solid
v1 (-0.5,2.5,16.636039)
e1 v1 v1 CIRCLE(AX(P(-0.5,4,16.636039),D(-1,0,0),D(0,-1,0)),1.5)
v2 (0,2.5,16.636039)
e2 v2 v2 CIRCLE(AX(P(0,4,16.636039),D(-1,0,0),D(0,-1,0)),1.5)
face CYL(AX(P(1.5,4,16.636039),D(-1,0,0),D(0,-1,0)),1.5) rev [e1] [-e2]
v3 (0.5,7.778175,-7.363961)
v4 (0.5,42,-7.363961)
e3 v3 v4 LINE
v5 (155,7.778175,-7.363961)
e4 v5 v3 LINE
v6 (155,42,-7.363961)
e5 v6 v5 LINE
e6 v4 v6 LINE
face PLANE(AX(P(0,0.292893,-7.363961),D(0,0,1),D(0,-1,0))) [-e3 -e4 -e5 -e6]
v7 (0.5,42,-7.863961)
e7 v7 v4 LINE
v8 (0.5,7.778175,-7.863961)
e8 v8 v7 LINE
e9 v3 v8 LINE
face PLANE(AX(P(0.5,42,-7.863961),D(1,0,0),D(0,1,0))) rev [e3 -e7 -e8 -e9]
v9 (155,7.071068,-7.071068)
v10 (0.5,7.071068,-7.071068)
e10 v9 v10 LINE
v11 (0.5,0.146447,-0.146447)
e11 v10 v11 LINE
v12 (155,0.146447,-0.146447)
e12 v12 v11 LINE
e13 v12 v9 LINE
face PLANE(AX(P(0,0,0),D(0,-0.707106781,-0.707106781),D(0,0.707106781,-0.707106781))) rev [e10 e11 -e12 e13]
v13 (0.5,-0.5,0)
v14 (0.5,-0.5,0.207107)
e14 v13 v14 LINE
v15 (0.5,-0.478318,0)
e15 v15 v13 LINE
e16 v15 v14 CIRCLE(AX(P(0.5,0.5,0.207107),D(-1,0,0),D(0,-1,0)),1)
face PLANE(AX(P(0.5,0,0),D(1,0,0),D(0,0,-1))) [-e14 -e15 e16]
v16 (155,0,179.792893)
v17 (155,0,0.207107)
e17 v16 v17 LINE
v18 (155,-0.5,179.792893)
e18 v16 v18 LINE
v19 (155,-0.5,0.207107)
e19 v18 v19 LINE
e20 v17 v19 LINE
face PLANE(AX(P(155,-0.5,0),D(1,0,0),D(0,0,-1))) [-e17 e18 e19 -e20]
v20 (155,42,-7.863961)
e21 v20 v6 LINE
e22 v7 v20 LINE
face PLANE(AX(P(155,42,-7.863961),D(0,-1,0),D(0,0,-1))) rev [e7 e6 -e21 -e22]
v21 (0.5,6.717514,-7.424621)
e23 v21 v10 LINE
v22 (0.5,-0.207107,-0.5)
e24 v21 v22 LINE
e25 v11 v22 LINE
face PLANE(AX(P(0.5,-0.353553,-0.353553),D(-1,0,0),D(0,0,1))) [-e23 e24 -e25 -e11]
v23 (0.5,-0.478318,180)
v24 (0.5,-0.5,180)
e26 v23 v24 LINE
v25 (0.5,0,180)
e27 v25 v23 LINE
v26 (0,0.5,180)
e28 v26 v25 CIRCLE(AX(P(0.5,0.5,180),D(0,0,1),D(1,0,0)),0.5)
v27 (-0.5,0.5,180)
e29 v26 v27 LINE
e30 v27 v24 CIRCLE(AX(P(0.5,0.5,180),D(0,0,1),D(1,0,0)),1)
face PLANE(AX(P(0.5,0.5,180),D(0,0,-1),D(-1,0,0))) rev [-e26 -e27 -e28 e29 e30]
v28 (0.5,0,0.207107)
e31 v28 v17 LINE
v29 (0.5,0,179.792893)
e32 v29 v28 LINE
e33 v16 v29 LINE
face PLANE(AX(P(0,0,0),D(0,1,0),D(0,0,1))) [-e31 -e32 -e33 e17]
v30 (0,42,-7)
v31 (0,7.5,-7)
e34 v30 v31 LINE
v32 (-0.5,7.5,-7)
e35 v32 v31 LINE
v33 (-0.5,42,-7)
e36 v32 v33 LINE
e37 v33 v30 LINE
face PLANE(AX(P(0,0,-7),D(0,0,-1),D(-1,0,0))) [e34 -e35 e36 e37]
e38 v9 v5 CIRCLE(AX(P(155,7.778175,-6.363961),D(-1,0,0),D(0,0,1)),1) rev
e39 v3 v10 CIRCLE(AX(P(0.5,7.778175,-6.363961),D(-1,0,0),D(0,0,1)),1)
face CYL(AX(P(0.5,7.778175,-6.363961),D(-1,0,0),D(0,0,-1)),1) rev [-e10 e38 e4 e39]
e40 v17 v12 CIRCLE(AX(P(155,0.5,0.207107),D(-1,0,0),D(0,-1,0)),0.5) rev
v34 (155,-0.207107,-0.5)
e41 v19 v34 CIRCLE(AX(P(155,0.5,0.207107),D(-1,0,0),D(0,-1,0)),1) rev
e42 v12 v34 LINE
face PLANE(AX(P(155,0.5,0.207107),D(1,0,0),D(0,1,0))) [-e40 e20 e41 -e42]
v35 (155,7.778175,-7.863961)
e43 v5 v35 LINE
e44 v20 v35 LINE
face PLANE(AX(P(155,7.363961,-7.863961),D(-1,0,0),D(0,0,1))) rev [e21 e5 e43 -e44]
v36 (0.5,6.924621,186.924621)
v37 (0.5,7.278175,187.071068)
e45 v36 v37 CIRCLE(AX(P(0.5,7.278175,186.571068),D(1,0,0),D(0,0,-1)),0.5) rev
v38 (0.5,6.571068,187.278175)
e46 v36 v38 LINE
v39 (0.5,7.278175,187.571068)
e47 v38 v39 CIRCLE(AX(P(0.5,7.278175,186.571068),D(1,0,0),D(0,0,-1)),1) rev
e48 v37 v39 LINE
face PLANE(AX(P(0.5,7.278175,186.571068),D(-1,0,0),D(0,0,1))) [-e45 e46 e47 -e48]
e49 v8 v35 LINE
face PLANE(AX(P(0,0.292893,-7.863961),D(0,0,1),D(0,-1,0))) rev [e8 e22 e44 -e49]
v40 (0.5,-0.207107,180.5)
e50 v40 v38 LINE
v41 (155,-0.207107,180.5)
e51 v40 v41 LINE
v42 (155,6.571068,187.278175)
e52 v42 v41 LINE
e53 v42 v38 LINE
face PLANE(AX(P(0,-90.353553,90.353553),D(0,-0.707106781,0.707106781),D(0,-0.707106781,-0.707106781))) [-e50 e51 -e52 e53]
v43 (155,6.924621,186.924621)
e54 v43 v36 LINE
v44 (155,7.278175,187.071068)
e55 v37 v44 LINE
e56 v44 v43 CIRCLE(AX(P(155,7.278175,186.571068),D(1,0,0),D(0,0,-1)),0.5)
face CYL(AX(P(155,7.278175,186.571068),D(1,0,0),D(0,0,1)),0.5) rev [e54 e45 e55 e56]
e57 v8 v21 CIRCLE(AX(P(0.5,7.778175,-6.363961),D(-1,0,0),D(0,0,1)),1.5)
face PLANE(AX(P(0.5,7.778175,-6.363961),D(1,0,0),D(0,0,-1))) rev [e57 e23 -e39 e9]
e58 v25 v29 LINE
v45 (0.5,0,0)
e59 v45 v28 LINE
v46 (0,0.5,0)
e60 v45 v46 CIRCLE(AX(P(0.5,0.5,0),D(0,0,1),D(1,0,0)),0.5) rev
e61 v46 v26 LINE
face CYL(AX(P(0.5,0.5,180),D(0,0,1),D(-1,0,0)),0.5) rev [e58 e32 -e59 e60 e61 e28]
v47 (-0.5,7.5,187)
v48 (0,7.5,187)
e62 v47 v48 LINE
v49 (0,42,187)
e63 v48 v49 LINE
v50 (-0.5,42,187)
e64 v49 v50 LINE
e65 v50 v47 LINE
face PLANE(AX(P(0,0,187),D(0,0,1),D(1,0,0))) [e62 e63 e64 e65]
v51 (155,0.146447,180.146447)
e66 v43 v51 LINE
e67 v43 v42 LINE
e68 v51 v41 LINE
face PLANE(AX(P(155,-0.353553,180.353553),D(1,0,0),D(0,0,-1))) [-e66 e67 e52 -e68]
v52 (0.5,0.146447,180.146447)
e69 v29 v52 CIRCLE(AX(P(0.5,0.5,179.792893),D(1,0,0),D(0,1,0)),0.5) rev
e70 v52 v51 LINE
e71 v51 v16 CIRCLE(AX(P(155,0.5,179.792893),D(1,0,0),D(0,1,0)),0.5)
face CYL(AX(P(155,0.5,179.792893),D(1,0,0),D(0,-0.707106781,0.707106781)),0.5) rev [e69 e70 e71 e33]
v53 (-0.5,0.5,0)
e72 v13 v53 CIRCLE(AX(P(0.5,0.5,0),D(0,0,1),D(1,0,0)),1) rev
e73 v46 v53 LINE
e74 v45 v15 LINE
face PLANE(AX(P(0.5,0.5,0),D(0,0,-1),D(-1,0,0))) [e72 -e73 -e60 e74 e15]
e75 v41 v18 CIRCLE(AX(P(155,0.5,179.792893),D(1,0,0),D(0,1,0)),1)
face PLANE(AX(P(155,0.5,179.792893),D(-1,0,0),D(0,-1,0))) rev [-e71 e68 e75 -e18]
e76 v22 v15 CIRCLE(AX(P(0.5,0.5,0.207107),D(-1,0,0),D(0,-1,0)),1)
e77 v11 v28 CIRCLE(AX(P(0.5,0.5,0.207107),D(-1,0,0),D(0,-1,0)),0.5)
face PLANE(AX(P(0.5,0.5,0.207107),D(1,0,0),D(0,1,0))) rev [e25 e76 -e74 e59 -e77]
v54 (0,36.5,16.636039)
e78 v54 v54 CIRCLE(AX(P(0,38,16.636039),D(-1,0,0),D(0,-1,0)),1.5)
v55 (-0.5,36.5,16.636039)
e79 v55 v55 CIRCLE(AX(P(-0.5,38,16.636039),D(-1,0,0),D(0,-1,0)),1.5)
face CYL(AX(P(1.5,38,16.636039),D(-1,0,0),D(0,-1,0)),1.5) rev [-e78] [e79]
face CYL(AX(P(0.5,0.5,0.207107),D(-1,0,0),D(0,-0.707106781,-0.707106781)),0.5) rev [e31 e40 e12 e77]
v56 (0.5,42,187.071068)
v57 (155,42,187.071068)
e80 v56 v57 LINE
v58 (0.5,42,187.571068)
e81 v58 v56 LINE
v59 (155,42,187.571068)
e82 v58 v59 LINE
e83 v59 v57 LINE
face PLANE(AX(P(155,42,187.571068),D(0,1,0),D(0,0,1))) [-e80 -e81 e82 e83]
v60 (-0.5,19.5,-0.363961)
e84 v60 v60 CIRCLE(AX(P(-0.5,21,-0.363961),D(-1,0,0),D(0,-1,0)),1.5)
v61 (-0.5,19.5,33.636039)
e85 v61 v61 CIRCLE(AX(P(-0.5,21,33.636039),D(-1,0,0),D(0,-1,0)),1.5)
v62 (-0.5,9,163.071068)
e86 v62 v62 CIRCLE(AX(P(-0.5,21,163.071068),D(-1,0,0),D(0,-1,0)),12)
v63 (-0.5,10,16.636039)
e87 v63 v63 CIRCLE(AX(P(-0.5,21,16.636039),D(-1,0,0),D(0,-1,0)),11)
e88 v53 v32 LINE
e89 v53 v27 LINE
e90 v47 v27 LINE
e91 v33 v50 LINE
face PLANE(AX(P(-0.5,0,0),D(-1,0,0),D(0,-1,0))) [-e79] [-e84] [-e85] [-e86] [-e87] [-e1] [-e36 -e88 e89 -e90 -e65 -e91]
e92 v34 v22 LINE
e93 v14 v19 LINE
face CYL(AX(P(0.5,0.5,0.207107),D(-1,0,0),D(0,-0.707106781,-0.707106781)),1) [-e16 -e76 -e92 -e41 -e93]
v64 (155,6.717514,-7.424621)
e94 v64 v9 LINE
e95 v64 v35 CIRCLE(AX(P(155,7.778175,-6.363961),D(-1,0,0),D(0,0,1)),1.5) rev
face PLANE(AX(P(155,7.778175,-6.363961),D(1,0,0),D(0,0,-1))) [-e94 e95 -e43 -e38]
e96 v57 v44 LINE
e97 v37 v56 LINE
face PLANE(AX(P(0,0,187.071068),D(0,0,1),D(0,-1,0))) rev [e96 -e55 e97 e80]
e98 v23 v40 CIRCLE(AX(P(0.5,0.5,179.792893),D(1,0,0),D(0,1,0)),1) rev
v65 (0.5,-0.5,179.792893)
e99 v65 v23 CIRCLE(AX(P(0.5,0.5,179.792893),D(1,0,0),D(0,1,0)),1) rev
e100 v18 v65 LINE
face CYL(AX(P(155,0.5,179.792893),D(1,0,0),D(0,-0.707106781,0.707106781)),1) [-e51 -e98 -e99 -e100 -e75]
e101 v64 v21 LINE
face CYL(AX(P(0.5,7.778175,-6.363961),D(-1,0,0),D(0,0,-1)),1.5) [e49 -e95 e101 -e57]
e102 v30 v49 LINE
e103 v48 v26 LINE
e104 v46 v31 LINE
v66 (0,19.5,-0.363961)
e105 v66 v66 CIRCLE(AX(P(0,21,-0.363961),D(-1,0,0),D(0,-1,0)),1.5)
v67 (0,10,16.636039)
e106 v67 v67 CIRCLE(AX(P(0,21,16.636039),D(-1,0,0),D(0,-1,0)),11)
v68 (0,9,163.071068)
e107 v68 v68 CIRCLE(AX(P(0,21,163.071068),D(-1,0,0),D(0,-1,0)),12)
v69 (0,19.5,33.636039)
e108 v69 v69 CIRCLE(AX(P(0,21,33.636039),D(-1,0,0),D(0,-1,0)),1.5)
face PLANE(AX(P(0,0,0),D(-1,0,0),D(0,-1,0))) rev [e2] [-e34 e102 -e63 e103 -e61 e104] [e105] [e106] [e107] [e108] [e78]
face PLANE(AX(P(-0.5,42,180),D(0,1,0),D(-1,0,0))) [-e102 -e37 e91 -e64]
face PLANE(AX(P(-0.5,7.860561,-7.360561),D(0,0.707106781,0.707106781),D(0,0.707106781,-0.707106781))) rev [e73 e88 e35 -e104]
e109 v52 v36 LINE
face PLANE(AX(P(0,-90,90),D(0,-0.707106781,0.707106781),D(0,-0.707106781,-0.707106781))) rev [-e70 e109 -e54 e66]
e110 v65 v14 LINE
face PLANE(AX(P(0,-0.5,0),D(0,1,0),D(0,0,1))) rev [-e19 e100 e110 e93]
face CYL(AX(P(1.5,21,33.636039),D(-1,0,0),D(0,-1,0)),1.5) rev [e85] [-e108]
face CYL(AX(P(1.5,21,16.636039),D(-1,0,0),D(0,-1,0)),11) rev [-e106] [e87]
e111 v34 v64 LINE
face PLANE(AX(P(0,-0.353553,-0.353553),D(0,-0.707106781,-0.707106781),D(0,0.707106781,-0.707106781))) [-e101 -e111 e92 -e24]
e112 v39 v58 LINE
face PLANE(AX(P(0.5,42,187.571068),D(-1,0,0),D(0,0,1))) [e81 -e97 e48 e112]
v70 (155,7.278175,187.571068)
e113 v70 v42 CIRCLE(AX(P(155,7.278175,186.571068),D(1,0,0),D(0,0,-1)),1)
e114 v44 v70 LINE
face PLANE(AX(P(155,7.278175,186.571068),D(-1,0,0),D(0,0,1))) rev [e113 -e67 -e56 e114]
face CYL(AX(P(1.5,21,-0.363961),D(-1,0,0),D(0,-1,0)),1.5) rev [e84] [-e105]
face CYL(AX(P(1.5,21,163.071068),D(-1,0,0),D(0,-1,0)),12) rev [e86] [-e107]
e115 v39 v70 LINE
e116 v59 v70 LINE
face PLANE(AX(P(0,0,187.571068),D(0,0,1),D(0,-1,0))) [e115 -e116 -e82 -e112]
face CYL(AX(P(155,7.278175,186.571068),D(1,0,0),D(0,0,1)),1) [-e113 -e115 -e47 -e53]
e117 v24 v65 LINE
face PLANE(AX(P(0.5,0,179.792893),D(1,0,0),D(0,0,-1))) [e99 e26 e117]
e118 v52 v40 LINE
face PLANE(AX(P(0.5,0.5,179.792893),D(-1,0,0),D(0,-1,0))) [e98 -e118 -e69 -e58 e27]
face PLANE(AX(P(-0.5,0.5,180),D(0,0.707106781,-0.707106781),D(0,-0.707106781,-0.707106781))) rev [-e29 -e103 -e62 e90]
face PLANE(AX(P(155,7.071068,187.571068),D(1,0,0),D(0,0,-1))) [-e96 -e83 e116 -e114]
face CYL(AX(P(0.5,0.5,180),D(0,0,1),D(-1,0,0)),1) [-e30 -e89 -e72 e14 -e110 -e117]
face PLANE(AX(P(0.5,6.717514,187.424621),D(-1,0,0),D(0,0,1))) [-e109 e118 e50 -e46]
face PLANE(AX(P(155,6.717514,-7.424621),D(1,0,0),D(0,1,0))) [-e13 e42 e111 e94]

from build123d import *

# Parameters (mm, degrees)
SKETCH1_W                    = 155
SKETCH1_H                    = 180
BASE_FLANGE1_DEPTH           = 0.5
EDGE_FLANGE1_STRIP_W         = 3
EDGE_FLANGE1_STRIP_H         = 0.5
EDGE_FLANGE1_STRIP_CUT_DEPTH = 180
EDGE_FLANGE1_DEPTH           = 180
EDGE_FLANGE3_STRIP_CUT_DEPTH = 154.5
EDGE_FLANGE3_DEPTH           = 154.5
EDGE_FLANGE4_DEPTH           = 154.5
SKETCH25_W                   = 0.5
SKETCH25_H                   = 41.5
BOSS_EXTRUDE1_DEPTH          = 7
CUT_EXTRUDE2_DEPTH           = 0.5
EDGE_FLANGE5_STRIP_CUT_DEPTH = 154.5
EDGE_FLANGE5_DEPTH           = 154.5
EDGE_FLANGE6_STRIP_CUT_DEPTH = 154.5
EDGE_FLANGE6_DEPTH           = 154.5
SKETCH41_W                   = 0.5
SKETCH41_H                   = 41.5
BOSS_EXTRUDE2_DEPTH          = 7
CUT_EXTRUDE3_DEPTH           = 0.5
SKETCH45_R                   = 11
SKETCH45_R_2                 = 12
CUT_EXTRUDE6_DEPTH           = 2
SKETCH51_R                   = 1.5
CUT_EXTRUDE7_DEPTH           = 2


# Sheet-metal steps are written as plain solids
with BuildPart() as part:
    # Sketch1 → Base-Flange1 (new body)
    with BuildSketch(Plane(origin=(0, 0, 0), x_dir=(1, 0, 0), z_dir=(0, 1, 0))):
        with Locations((77.5, -90)):
            Rectangle(SKETCH1_W, SKETCH1_H)
    extrude(amount=-BASE_FLANGE1_DEPTH)

    # Edge-Flange1 strip (across the edge) → Edge-Flange1 strip cut (cut)
    with BuildSketch(Plane.XY):
        with Locations((-1, -0.25)):
            Rectangle(EDGE_FLANGE1_STRIP_W, EDGE_FLANGE1_STRIP_H)
    extrude(amount=EDGE_FLANGE1_STRIP_CUT_DEPTH, mode=Mode.SUBTRACT)

    # Edge-Flange1 section (across the edge) → Edge-Flange1 (add)
    with BuildSketch(Plane.XY):
        with BuildLine():
            Line((-0.5, 0.5), (-0.5, 42))
            Line((-0.5, 42), (0, 42))
            Line((0, 42), (0, 0.5))
            ThreePointArc((0, 0.5), (0.146446609, 0.146446609), (0.5, 0))
            Line((0.5, 0), (0.5, -0.5))
            ThreePointArc((0.5, -0.5), (-0.207106781, -0.207106781), (-0.5, 0.5))
        make_face()
    extrude(amount=EDGE_FLANGE1_DEPTH)

    # Edge-Flange3 strip (across the edge) → Edge-Flange3 strip cut (cut)
    with BuildSketch(Plane(origin=(155, 0, 0), x_dir=(0, 0.7071067811865512, 0.7071067811865438), z_dir=(-1, 0, 0))):
        Polygon((-2.328427125, 1.621320344), (-0.207106781, -0.5), (0.146446609, -0.146446609), (-1.974873734, 1.974873734), align=None)
    extrude(amount=EDGE_FLANGE3_STRIP_CUT_DEPTH, mode=Mode.SUBTRACT)

    # Edge-Flange3 section (across the edge) → Edge-Flange3 (add)
    with BuildSketch(Plane(origin=(155, 0, 0), x_dir=(0, 0.7071067811865512, 0.7071067811865438), z_dir=(-1, 0, 0))):
        with BuildLine():
            Line((-0.5, 0.207106781), (-0.5, 10))
            Line((-0.5, 10), (0, 10))
            Line((0, 10), (0, 0.207106781))
            ThreePointArc((0, 0.207106781), (0.038060234, 0.015765065), (0.146446609, -0.146446609))
            Line((0.146446609, -0.146446609), (-0.207106781, -0.5))
            ThreePointArc((-0.207106781, -0.5), (-0.423879533, -0.175576651), (-0.5, 0.207106781))
        make_face()
    extrude(amount=EDGE_FLANGE3_DEPTH)

    # Edge-Flange4 section (across the edge) → Edge-Flange4 (add)
    with BuildSketch(Plane(origin=(155, 7.363961031, -7.363961031), x_dir=(0, 0, 1), z_dir=(-1, 0, 0))):
        with BuildLine():
            Line((-0.5, 0.414213562), (-0.5, 34.636038969))
            Line((-0.5, 34.636038969), (0, 34.636038969))
            Line((0, 34.636038969), (0, 0.414213562))
            ThreePointArc((0, 0.414213562), (0.076120467, 0.03153013), (0.292893219, -0.292893219))
            Line((0.292893219, -0.292893219), (-0.060660172, -0.646446609))
            ThreePointArc((-0.060660172, -0.646446609), (-0.385819299, -0.159811586), (-0.5, 0.414213562))
        make_face()
    extrude(amount=EDGE_FLANGE4_DEPTH)

    # Sketch25 → Boss-Extrude1 (add)
    with BuildSketch(Plane(origin=(0, 0, 0), x_dir=(-1, 0, 0), z_dir=(0, 0, -1))):
        with Locations((0.25, 21.25)):
            Rectangle(SKETCH25_W, SKETCH25_H)
    extrude(amount=BOSS_EXTRUDE1_DEPTH)

    # Sketch28 → Cut-Extrude2 (cut)
    with BuildSketch(Plane.ZY.offset(0.5)):
        Polygon((-7.360561455, 7.860561455), (0, 0.5), (-7.360561455, 0.5), align=None)
    extrude(amount=-CUT_EXTRUDE2_DEPTH, mode=Mode.SUBTRACT)

    # Edge-Flange5 strip (across the edge) → Edge-Flange5 strip cut (cut)
    with BuildSketch(Plane(origin=(0.5, 0, 180), x_dir=(0, 0.7071067811865512, -0.7071067811865438), z_dir=(1, 0, 0))):
        Polygon((-2.328427125, 1.621320344), (-0.207106781, -0.5), (0.146446609, -0.146446609), (-1.974873734, 1.974873734), align=None)
    extrude(amount=EDGE_FLANGE5_STRIP_CUT_DEPTH, mode=Mode.SUBTRACT)

    # Edge-Flange5 section (across the edge) → Edge-Flange5 (add)
    with BuildSketch(Plane(origin=(0.5, 0, 180), x_dir=(0, 0.7071067811865512, -0.7071067811865438), z_dir=(1, 0, 0))):
        with BuildLine():
            Line((-0.5, 0.207106781), (-0.5, 10))
            Line((-0.5, 10), (0, 10))
            Line((0, 10), (0, 0.207106781))
            ThreePointArc((0, 0.207106781), (0.038060234, 0.015765065), (0.146446609, -0.146446609))
            Line((0.146446609, -0.146446609), (-0.207106781, -0.5))
            ThreePointArc((-0.207106781, -0.5), (-0.423879533, -0.175576651), (-0.5, 0.207106781))
        make_face()
    extrude(amount=EDGE_FLANGE5_DEPTH)

    # Edge-Flange6 strip (across the edge) → Edge-Flange6 strip cut (cut)
    with BuildSketch(Plane(origin=(0.5, 7.071067812, 187.071067812), x_dir=(0, 0, -1), z_dir=(1, 0, 0))):
        Polygon((-2.328427125, 1.621320344), (-0.207106781, -0.5), (0.146446609, -0.146446609), (-1.974873734, 1.974873734), align=None)
    extrude(amount=EDGE_FLANGE6_STRIP_CUT_DEPTH, mode=Mode.SUBTRACT)

    # Edge-Flange6 section (across the edge) → Edge-Flange6 (add)
    with BuildSketch(Plane(origin=(0.5, 7.071067812, 187.071067812), x_dir=(0, 0, -1), z_dir=(1, 0, 0))):
        with BuildLine():
            Line((-0.5, 0.207106781), (-0.5, 34.928932188))
            Line((-0.5, 34.928932188), (0, 34.928932188))
            Line((0, 34.928932188), (0, 0.207106781))
            ThreePointArc((0, 0.207106781), (0.038060234, 0.015765065), (0.146446609, -0.146446609))
            Line((0.146446609, -0.146446609), (-0.207106781, -0.5))
            ThreePointArc((-0.207106781, -0.5), (-0.423879533, -0.175576651), (-0.5, 0.207106781))
        make_face()
    extrude(amount=EDGE_FLANGE6_DEPTH)

    # Sketch41 → Boss-Extrude2 (add)
    with BuildSketch(Plane.XY.offset(180)):
        with Locations((-0.25, 21.25)):
            Rectangle(SKETCH41_W, SKETCH41_H)
    extrude(amount=BOSS_EXTRUDE2_DEPTH)

    # Sketch44 → Cut-Extrude3 (cut)
    with BuildSketch(Plane.ZY.offset(0.5)):
        Polygon((180, 0.5), (187, 7.5), (187, 0.5), align=None)
    extrude(amount=-CUT_EXTRUDE3_DEPTH, mode=Mode.SUBTRACT)

    # Sketch45 → Cut-Extrude6 (cut)
    with BuildSketch(Plane.ZY.offset(0.5)):
        with Locations(Location((16.636038969, 21, 0), (0, 0, 270))):
            Circle(SKETCH45_R)
        with Locations(Location((163.071067812, 21, 0), (0, 0, 270))):
            Circle(SKETCH45_R_2)
    extrude(amount=-CUT_EXTRUDE6_DEPTH, mode=Mode.SUBTRACT)

    # Sketch51 → Cut-Extrude7 (cut)
    with BuildSketch(Plane.ZY.offset(0.5)):
        with Locations(Location((16.636038969, 38, 0), (0, 0, 270))):
            Circle(SKETCH51_R)
        with Locations(Location((33.636038969, 21, 0), (0, 0, 270))):
            Circle(SKETCH51_R)
        with Locations(Location((16.636038969, 4, 0), (0, 0, 270))):
            Circle(SKETCH51_R)
        with Locations(Location((-0.363961031, 21, 0), (0, 0, 270))):
            Circle(SKETCH51_R)
    extrude(amount=-CUT_EXTRUDE7_DEPTH, mode=Mode.SUBTRACT)


solid = part.part
